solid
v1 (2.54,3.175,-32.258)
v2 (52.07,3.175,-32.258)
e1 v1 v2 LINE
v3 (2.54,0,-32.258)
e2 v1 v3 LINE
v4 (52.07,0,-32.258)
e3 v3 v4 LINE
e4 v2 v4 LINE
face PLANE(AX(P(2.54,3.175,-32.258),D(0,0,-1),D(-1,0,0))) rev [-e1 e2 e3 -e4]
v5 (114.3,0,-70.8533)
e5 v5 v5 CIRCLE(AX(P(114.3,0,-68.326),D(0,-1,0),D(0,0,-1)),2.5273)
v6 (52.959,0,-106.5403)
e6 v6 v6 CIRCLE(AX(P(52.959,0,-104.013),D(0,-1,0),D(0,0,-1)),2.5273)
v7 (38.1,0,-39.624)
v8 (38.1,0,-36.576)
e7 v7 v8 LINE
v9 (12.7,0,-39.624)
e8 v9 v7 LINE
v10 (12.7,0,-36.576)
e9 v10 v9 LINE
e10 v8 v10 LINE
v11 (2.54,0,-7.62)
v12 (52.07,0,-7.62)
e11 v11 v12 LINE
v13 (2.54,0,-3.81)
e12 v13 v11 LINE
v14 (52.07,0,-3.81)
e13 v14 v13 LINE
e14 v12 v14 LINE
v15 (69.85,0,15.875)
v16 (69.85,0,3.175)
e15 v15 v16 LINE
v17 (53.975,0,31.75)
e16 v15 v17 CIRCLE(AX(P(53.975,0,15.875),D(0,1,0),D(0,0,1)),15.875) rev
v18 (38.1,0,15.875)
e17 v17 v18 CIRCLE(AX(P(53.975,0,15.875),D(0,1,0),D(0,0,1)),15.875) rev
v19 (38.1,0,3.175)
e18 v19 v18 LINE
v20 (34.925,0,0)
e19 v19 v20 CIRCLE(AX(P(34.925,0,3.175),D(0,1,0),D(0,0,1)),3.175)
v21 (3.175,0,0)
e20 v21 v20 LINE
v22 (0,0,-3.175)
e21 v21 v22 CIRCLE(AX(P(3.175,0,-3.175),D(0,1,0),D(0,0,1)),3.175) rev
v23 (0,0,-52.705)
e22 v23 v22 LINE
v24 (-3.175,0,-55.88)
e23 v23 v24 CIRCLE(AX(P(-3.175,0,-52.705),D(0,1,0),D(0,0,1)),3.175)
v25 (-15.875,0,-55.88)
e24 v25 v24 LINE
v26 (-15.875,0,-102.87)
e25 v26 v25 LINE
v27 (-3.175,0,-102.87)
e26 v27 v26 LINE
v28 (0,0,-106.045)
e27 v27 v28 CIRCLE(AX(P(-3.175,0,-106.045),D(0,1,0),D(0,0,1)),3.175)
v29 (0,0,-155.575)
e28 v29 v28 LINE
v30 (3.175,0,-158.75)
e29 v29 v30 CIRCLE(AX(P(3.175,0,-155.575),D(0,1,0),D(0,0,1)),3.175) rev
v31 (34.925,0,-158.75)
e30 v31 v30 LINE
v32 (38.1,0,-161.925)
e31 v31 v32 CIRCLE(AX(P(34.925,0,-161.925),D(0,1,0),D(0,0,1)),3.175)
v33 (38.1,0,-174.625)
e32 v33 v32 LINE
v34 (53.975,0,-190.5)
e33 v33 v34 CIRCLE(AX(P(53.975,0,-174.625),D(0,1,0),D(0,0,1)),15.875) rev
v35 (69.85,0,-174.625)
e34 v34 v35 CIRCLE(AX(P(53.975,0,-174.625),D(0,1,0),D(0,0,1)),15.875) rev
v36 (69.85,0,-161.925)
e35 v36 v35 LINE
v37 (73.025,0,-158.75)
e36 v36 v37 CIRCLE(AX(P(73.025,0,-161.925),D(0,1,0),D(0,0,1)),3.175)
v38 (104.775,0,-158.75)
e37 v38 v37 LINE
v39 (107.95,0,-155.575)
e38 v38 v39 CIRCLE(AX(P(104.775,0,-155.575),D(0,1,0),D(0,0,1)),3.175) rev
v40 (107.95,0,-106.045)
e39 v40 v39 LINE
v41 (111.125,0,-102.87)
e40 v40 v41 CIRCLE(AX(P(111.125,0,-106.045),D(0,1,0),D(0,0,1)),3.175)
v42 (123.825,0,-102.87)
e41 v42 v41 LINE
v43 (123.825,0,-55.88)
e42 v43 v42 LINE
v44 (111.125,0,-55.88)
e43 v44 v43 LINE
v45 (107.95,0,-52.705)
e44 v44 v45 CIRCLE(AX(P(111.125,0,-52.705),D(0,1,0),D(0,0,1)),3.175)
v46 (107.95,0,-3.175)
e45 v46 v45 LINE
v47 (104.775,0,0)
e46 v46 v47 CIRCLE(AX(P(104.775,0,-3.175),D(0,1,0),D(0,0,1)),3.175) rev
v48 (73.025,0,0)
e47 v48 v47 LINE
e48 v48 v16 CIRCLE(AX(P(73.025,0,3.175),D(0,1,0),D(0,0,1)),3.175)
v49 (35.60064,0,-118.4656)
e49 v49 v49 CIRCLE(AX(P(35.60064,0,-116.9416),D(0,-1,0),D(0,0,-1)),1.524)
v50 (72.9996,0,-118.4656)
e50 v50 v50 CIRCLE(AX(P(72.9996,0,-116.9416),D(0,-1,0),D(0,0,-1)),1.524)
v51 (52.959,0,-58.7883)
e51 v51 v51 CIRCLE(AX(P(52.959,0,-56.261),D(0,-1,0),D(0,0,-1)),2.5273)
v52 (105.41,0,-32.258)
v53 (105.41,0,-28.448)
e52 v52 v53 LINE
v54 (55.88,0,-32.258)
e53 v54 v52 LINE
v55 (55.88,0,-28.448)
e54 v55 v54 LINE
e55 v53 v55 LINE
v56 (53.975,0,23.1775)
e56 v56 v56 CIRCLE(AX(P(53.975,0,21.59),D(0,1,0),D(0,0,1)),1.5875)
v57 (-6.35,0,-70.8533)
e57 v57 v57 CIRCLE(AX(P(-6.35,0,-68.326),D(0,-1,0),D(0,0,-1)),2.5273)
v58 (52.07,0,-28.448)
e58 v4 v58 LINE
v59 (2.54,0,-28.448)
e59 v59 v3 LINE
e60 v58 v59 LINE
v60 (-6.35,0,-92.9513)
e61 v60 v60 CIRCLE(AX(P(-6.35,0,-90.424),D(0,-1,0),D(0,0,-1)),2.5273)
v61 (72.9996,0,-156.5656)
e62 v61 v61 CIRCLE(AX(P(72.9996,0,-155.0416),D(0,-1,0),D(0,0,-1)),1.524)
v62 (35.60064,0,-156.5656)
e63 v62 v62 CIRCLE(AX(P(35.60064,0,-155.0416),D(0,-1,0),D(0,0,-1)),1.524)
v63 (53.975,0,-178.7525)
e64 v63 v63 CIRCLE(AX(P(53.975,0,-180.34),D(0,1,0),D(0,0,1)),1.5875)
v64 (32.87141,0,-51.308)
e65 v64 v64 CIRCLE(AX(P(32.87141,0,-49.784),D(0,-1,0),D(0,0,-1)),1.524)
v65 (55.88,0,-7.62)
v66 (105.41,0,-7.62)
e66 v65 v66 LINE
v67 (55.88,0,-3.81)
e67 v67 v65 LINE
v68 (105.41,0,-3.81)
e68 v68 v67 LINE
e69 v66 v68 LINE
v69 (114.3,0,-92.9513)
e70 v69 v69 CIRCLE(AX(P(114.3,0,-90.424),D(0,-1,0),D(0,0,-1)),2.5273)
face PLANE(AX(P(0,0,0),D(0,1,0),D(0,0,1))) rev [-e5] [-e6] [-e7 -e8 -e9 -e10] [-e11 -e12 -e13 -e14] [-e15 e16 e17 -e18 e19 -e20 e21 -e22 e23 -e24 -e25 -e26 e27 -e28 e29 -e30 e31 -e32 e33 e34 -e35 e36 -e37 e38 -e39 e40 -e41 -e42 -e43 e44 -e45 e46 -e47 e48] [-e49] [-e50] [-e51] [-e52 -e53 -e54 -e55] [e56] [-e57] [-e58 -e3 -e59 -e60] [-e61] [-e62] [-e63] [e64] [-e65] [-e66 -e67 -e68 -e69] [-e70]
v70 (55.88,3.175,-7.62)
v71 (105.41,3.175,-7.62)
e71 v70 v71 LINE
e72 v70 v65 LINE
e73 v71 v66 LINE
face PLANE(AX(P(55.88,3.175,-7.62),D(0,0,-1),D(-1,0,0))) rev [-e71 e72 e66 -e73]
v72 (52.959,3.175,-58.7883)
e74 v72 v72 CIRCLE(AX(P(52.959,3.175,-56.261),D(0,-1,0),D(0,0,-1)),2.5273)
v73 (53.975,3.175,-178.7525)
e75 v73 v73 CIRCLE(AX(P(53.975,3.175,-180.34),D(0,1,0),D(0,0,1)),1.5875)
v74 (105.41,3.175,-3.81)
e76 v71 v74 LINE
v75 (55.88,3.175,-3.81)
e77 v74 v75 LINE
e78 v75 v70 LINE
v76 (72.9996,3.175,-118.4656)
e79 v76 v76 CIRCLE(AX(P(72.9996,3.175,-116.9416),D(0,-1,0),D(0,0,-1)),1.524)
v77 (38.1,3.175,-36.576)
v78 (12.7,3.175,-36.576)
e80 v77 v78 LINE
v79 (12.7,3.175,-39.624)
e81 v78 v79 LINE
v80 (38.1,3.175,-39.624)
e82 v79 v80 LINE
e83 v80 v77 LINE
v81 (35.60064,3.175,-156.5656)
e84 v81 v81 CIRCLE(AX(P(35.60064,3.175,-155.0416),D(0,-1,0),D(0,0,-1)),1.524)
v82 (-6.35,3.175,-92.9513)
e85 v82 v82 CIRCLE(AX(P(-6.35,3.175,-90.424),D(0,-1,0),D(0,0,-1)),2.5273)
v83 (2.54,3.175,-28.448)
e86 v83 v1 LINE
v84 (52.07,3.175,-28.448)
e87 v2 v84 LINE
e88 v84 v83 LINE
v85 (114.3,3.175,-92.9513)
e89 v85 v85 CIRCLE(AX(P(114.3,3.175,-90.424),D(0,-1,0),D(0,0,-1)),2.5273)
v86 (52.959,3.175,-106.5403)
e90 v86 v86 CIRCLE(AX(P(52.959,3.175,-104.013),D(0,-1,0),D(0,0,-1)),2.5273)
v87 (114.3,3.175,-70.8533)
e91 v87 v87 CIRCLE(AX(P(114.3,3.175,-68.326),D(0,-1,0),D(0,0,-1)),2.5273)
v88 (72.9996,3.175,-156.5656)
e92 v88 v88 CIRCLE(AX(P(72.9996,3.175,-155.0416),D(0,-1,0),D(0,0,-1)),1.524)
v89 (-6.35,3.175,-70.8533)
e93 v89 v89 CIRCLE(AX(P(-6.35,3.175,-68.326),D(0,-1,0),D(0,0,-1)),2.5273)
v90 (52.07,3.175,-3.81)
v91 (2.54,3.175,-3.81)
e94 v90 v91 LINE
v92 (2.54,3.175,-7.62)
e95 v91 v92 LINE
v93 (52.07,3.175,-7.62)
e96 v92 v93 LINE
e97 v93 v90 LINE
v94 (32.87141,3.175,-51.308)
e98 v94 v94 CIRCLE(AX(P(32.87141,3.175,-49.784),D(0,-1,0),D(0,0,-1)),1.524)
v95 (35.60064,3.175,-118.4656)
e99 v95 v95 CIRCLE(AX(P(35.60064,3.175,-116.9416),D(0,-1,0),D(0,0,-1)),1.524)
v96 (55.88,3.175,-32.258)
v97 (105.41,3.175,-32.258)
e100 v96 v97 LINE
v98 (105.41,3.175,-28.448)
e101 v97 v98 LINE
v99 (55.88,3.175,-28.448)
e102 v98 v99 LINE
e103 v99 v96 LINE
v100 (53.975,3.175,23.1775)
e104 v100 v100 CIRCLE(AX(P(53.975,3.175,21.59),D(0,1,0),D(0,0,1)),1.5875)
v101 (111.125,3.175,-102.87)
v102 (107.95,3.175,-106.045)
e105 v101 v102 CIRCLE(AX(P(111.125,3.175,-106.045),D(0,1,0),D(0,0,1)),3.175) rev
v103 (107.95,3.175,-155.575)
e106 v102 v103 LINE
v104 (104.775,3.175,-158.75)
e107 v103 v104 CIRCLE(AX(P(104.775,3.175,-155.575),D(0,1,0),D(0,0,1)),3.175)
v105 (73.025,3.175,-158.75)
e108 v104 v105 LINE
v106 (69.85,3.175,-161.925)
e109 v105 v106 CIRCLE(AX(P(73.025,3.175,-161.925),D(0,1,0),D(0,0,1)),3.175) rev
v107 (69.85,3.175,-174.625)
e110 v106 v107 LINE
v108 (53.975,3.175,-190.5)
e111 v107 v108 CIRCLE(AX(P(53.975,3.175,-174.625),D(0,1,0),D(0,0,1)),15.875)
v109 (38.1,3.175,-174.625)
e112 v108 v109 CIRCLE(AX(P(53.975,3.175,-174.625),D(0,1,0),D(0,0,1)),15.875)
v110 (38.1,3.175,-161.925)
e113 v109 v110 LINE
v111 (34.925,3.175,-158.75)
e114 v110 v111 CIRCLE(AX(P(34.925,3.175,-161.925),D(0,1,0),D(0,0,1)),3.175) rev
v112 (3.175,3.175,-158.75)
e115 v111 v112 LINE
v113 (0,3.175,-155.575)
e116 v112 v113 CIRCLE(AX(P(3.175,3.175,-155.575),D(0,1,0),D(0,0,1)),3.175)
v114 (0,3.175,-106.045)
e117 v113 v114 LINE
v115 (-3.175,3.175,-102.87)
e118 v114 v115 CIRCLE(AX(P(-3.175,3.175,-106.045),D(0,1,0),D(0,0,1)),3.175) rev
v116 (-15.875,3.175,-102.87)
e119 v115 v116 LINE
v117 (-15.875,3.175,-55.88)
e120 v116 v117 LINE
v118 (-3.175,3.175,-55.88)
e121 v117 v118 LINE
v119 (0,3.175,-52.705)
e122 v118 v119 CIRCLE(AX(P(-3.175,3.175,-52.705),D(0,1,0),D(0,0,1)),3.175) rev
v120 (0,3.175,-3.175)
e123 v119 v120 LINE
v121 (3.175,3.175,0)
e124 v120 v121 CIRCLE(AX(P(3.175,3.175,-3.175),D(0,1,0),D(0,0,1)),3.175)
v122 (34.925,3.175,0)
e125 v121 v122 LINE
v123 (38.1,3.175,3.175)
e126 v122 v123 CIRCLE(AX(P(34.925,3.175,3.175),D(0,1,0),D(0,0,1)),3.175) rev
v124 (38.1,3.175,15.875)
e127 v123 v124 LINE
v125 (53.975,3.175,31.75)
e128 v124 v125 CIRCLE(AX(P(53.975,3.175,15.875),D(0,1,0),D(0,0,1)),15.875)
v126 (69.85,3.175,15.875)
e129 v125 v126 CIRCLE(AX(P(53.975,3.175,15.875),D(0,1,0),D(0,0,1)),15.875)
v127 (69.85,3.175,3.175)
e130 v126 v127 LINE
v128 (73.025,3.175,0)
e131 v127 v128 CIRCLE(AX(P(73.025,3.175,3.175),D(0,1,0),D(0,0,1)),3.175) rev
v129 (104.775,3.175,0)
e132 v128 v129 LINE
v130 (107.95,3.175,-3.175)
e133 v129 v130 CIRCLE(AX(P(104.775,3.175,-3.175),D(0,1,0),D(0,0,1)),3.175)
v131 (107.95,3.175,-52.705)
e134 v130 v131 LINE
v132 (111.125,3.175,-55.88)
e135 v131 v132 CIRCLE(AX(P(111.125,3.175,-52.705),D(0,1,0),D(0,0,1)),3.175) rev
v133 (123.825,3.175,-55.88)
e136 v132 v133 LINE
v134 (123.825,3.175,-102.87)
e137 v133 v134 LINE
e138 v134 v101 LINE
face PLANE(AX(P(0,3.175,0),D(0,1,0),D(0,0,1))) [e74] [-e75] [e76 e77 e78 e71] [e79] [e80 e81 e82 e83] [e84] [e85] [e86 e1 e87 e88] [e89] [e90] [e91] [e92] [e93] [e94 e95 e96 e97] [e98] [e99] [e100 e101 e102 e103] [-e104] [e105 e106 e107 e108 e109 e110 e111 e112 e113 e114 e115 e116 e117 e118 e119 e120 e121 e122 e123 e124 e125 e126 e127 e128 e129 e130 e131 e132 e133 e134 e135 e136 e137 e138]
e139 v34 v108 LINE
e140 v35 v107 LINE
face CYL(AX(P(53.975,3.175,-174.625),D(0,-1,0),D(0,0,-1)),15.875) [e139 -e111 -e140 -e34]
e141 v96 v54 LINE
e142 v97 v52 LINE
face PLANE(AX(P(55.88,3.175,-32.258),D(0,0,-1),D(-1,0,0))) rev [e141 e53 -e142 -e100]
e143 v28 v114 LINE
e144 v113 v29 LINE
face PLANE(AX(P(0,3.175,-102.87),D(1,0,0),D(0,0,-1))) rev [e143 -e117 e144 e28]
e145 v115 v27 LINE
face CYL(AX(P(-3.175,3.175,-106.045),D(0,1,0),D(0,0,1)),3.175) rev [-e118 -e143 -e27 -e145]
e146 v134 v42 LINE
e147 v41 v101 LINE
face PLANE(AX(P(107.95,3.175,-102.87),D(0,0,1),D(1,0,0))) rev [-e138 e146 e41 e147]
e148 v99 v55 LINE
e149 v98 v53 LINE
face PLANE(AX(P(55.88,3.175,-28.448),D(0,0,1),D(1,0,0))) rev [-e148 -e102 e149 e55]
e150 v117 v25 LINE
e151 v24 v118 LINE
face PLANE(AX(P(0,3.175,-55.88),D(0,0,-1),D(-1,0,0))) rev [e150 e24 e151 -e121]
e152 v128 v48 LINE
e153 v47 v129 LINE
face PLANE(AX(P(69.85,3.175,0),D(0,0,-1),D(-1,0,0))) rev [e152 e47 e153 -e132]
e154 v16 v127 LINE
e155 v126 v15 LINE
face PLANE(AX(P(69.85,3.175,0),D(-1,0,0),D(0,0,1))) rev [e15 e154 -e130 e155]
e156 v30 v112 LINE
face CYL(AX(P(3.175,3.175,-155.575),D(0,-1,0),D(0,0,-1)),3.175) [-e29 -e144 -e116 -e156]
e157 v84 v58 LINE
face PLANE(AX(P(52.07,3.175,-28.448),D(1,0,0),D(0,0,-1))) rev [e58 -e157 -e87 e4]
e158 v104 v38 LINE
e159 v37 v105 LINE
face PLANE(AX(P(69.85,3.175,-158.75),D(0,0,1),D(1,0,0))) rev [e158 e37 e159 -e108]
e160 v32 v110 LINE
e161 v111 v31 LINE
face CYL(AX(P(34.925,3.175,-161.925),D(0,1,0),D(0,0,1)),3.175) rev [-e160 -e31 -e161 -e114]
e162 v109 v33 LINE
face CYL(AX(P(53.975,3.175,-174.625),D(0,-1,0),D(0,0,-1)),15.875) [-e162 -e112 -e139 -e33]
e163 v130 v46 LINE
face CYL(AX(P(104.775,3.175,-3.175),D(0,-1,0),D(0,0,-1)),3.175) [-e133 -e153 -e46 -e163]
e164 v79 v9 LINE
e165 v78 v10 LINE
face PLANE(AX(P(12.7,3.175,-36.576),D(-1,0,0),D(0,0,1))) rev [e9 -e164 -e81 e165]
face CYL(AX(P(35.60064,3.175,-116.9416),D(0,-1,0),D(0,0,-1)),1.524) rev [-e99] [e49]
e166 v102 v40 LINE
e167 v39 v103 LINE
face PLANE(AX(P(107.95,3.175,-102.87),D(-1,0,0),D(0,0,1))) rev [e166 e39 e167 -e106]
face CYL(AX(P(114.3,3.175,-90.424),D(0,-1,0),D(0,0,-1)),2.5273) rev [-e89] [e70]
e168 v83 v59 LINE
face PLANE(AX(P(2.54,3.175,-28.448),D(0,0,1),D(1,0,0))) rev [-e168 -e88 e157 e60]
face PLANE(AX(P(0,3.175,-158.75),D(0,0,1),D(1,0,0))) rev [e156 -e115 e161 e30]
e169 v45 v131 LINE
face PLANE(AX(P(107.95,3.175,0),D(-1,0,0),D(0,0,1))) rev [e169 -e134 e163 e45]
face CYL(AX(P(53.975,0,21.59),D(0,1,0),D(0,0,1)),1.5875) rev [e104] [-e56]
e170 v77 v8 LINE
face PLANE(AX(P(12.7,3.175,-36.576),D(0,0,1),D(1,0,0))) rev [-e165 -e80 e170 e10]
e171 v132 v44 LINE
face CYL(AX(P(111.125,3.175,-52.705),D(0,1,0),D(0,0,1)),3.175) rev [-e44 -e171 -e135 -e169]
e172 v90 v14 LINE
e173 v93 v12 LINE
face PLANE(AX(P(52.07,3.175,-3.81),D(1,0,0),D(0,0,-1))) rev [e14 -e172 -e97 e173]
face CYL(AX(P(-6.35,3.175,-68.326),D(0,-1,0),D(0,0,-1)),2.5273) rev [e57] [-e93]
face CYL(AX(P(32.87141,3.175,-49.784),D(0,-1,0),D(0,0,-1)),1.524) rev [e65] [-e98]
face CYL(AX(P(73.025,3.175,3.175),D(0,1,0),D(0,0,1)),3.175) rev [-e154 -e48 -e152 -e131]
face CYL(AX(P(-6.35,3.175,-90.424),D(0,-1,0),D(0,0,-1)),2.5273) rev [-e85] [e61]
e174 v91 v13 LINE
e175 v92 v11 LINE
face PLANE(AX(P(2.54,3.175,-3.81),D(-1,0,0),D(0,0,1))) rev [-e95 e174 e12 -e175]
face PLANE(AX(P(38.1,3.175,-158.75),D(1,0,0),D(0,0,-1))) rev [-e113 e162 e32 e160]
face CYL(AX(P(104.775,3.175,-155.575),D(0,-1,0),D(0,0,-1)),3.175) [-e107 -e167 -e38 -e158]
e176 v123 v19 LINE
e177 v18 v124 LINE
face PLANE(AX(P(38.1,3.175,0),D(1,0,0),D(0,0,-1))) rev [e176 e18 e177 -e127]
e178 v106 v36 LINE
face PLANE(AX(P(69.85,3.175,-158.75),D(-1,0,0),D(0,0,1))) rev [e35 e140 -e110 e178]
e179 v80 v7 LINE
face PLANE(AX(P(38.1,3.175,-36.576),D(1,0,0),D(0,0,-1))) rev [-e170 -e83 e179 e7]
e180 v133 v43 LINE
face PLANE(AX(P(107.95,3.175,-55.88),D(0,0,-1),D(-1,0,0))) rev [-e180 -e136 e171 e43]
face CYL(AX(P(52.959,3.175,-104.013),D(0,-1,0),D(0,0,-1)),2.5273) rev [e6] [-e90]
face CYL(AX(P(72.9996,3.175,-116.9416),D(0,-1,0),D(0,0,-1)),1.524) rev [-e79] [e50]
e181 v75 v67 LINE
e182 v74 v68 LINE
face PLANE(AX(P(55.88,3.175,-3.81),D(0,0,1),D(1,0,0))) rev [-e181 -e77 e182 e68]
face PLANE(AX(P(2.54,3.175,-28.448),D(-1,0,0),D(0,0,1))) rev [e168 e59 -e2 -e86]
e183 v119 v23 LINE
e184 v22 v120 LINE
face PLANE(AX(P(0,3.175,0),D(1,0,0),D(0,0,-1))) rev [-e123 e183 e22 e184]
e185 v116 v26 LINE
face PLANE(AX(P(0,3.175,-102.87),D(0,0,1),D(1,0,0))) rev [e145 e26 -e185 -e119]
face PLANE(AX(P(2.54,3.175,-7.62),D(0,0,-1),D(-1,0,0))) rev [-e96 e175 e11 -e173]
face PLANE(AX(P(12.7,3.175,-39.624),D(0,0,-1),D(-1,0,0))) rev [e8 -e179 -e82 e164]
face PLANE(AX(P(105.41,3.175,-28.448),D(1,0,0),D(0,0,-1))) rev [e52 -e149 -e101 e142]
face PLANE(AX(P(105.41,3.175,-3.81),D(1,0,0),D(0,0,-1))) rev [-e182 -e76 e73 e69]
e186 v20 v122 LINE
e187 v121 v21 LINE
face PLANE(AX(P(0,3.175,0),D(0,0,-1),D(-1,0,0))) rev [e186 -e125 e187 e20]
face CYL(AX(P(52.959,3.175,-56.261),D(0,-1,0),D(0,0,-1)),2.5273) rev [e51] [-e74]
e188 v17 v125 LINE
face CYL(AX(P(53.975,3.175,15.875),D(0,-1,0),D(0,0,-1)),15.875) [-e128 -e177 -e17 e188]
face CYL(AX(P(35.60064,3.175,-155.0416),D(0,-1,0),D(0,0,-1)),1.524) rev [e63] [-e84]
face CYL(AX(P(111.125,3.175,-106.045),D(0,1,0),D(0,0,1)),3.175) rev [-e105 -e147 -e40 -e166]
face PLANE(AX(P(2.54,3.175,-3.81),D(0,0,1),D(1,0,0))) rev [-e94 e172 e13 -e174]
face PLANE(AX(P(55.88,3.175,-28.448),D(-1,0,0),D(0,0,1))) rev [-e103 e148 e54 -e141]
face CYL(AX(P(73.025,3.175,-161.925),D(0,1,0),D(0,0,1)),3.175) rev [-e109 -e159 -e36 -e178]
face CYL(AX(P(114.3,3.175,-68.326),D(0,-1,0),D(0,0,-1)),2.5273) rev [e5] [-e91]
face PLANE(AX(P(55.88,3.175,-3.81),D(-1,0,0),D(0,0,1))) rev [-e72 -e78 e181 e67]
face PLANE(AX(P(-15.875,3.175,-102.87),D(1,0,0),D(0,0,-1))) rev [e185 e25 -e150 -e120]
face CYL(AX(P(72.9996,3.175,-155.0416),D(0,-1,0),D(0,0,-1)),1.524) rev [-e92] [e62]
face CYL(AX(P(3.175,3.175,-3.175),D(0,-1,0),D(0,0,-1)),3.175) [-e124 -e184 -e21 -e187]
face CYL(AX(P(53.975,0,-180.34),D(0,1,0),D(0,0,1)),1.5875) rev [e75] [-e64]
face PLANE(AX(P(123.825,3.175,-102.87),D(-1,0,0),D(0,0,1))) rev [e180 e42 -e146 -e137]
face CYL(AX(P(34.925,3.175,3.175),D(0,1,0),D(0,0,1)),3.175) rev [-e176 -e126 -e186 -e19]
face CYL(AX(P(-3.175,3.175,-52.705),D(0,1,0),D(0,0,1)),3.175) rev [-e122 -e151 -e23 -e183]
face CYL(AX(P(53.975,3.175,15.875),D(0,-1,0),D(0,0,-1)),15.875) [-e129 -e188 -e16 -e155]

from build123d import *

# Parameters (mm, degrees)
BOSS_EXTRUDE1_DEPTH = 3.175
FILLET1_R           = 3.175
FILLET2_R           = 15.875
SKETCH2_R           = 1.5875
CUT_EXTRUDE1_DEPTH  = 228.228874156
SKETCH3_R           = 2.5273
CUT_EXTRUDE2_DEPTH  = 228.228874156
SKETCH4_R           = 2.5273
CUT_EXTRUDE3_DEPTH  = 228.228874156
SKETCH7_R           = 1.524
CUT_EXTRUDE6_DEPTH  = 228.228874156
SKETCH8_R           = 1.524
CUT_EXTRUDE7_DEPTH  = 228.228874156
SKETCH10_W          = 25.4
SKETCH10_H          = 3.048
CUT_EXTRUDE9_DEPTH  = 228.228874156
SKETCH11_W          = 49.53
SKETCH11_H          = 3.81
CUT_EXTRUDE10_DEPTH = 228.228874156


with BuildPart() as part:
    # Sketch1 → Boss-Extrude1 (new body)
    with BuildSketch(Plane(origin=(0, 0, 0), x_dir=(1, 0, 0), z_dir=(0, 1, 0))):
        Polygon((0, 102.87), (0, 158.75), (38.1, 158.75), (38.1, 190.5), (69.85, 190.5), (69.85, 158.75), (107.95, 158.75), (107.95, 102.87), (123.825, 102.87), (123.825, 55.88), (107.95, 55.88), (107.95, 0), (69.85, 0), (69.85, -31.75), (38.1, -31.75), (38.1, 0), (0, 0), (0, 55.88), (-15.875, 55.88), (-15.875, 102.87), align=None)
    extrude(amount=BOSS_EXTRUDE1_DEPTH)

    # Fillet1
    fillet1_edges = [part.edges().sort_by_distance(p)[0] for p in [
        (0, 1.5875, -55.88),
        (0, 1.5875, -102.87),
        (0, 1.5875, -158.75),
        (38.1, 1.5875, -158.75),
        (69.85, 1.5875, -158.75),
        (107.95, 1.5875, -158.75),
        (107.95, 1.5875, -102.87),
        (107.95, 1.5875, -55.88),
        (107.95, 1.5875, 0),
        (69.85, 1.5875, 0),
        (38.1, 1.5875, 0),
        (0, 1.5875, 0),
    ]]
    fillet(fillet1_edges, radius=FILLET1_R)

    # Fillet2
    fillet2_edges = [part.edges().sort_by_distance(p)[0] for p in [
        (38.1, 1.5875, 31.75),
        (69.85, 1.5875, 31.75),
        (69.85, 1.5875, -190.5),
        (38.1, 1.5875, -190.5),
    ]]
    fillet(fillet2_edges, radius=FILLET2_R - 0.0001)  # a hair under: the kernel refuses the full size

    # Sketch2 → Cut-Extrude1 (cut, through all)
    with BuildSketch(Plane(origin=(0, 3.175, 0), x_dir=(1, 0, 0), z_dir=(0, 1, 0))):
        with Locations(Location((53.975, 180.34, 0), (0, 0, 270))):
            Circle(SKETCH2_R)
        with Locations(Location((53.975, -21.59, 0), (0, 0, 270))):
            Circle(SKETCH2_R)
    extrude(amount=-CUT_EXTRUDE1_DEPTH, mode=Mode.SUBTRACT)

    # Sketch3 → Cut-Extrude2 (cut, through all)
    with BuildSketch(Plane.XZ):
        with Locations(Location((-6.35, -68.326, 0), (0, 0, 270))):
            Circle(SKETCH3_R)
        with Locations(Location((-6.35, -90.424, 0), (0, 0, 270))):
            Circle(SKETCH3_R)
        with Locations(Location((114.3, -68.326, 0), (0, 0, 270))):
            Circle(SKETCH3_R)
        with Locations(Location((114.3, -90.424, 0), (0, 0, 270))):
            Circle(SKETCH3_R)
    extrude(amount=-CUT_EXTRUDE2_DEPTH, mode=Mode.SUBTRACT)

    # Sketch4 → Cut-Extrude3 (cut, through all)
    with BuildSketch(Plane.XZ):
        with Locations(Location((52.959, -56.261, 0), (0, 0, 270))):
            Circle(SKETCH4_R)
        with Locations(Location((52.959, -104.013, 0), (0, 0, 270))):
            Circle(SKETCH4_R)
    extrude(amount=-CUT_EXTRUDE3_DEPTH, mode=Mode.SUBTRACT)

    # Sketch7 → Cut-Extrude6 (cut, through all)
    with BuildSketch(Plane.XZ):
        with Locations(Location((32.87141, -49.784, 0), (0, 0, 270))):
            Circle(SKETCH7_R)
    extrude(amount=-CUT_EXTRUDE6_DEPTH, mode=Mode.SUBTRACT)

    # Sketch8 → Cut-Extrude7 (cut, through all)
    with BuildSketch(Plane.XZ):
        with Locations(Location((35.60064, -116.9416, 0), (0, 0, 270))):
            Circle(SKETCH8_R)
        with Locations(Location((35.60064, -155.0416, 0), (0, 0, 270))):
            Circle(SKETCH8_R)
        with Locations(Location((72.9996, -116.9416, 0), (0, 0, 270))):
            Circle(SKETCH8_R)
        with Locations(Location((72.9996, -155.0416, 0), (0, 0, 270))):
            Circle(SKETCH8_R)
    extrude(amount=-CUT_EXTRUDE7_DEPTH, mode=Mode.SUBTRACT)

    # Sketch10 → Cut-Extrude9 (cut, through all)
    with BuildSketch(Plane.XZ):
        with Locations((25.4, -38.1)):
            Rectangle(SKETCH10_W, SKETCH10_H)
    extrude(amount=-CUT_EXTRUDE9_DEPTH, mode=Mode.SUBTRACT)

    # Sketch11 → Cut-Extrude10 (cut, through all)
    with BuildSketch(Plane.XZ):
        with Locations((27.305, -5.715)):
            Rectangle(SKETCH11_W, SKETCH11_H)
        with Locations((27.305, -30.353)):
            Rectangle(SKETCH11_W, SKETCH11_H)
        with Locations((80.645, -5.715)):
            Rectangle(SKETCH11_W, SKETCH11_H)
        with Locations((80.645, -30.353)):
            Rectangle(SKETCH11_W, SKETCH11_H)
    extrude(amount=-CUT_EXTRUDE10_DEPTH, mode=Mode.SUBTRACT)


solid = part.part
